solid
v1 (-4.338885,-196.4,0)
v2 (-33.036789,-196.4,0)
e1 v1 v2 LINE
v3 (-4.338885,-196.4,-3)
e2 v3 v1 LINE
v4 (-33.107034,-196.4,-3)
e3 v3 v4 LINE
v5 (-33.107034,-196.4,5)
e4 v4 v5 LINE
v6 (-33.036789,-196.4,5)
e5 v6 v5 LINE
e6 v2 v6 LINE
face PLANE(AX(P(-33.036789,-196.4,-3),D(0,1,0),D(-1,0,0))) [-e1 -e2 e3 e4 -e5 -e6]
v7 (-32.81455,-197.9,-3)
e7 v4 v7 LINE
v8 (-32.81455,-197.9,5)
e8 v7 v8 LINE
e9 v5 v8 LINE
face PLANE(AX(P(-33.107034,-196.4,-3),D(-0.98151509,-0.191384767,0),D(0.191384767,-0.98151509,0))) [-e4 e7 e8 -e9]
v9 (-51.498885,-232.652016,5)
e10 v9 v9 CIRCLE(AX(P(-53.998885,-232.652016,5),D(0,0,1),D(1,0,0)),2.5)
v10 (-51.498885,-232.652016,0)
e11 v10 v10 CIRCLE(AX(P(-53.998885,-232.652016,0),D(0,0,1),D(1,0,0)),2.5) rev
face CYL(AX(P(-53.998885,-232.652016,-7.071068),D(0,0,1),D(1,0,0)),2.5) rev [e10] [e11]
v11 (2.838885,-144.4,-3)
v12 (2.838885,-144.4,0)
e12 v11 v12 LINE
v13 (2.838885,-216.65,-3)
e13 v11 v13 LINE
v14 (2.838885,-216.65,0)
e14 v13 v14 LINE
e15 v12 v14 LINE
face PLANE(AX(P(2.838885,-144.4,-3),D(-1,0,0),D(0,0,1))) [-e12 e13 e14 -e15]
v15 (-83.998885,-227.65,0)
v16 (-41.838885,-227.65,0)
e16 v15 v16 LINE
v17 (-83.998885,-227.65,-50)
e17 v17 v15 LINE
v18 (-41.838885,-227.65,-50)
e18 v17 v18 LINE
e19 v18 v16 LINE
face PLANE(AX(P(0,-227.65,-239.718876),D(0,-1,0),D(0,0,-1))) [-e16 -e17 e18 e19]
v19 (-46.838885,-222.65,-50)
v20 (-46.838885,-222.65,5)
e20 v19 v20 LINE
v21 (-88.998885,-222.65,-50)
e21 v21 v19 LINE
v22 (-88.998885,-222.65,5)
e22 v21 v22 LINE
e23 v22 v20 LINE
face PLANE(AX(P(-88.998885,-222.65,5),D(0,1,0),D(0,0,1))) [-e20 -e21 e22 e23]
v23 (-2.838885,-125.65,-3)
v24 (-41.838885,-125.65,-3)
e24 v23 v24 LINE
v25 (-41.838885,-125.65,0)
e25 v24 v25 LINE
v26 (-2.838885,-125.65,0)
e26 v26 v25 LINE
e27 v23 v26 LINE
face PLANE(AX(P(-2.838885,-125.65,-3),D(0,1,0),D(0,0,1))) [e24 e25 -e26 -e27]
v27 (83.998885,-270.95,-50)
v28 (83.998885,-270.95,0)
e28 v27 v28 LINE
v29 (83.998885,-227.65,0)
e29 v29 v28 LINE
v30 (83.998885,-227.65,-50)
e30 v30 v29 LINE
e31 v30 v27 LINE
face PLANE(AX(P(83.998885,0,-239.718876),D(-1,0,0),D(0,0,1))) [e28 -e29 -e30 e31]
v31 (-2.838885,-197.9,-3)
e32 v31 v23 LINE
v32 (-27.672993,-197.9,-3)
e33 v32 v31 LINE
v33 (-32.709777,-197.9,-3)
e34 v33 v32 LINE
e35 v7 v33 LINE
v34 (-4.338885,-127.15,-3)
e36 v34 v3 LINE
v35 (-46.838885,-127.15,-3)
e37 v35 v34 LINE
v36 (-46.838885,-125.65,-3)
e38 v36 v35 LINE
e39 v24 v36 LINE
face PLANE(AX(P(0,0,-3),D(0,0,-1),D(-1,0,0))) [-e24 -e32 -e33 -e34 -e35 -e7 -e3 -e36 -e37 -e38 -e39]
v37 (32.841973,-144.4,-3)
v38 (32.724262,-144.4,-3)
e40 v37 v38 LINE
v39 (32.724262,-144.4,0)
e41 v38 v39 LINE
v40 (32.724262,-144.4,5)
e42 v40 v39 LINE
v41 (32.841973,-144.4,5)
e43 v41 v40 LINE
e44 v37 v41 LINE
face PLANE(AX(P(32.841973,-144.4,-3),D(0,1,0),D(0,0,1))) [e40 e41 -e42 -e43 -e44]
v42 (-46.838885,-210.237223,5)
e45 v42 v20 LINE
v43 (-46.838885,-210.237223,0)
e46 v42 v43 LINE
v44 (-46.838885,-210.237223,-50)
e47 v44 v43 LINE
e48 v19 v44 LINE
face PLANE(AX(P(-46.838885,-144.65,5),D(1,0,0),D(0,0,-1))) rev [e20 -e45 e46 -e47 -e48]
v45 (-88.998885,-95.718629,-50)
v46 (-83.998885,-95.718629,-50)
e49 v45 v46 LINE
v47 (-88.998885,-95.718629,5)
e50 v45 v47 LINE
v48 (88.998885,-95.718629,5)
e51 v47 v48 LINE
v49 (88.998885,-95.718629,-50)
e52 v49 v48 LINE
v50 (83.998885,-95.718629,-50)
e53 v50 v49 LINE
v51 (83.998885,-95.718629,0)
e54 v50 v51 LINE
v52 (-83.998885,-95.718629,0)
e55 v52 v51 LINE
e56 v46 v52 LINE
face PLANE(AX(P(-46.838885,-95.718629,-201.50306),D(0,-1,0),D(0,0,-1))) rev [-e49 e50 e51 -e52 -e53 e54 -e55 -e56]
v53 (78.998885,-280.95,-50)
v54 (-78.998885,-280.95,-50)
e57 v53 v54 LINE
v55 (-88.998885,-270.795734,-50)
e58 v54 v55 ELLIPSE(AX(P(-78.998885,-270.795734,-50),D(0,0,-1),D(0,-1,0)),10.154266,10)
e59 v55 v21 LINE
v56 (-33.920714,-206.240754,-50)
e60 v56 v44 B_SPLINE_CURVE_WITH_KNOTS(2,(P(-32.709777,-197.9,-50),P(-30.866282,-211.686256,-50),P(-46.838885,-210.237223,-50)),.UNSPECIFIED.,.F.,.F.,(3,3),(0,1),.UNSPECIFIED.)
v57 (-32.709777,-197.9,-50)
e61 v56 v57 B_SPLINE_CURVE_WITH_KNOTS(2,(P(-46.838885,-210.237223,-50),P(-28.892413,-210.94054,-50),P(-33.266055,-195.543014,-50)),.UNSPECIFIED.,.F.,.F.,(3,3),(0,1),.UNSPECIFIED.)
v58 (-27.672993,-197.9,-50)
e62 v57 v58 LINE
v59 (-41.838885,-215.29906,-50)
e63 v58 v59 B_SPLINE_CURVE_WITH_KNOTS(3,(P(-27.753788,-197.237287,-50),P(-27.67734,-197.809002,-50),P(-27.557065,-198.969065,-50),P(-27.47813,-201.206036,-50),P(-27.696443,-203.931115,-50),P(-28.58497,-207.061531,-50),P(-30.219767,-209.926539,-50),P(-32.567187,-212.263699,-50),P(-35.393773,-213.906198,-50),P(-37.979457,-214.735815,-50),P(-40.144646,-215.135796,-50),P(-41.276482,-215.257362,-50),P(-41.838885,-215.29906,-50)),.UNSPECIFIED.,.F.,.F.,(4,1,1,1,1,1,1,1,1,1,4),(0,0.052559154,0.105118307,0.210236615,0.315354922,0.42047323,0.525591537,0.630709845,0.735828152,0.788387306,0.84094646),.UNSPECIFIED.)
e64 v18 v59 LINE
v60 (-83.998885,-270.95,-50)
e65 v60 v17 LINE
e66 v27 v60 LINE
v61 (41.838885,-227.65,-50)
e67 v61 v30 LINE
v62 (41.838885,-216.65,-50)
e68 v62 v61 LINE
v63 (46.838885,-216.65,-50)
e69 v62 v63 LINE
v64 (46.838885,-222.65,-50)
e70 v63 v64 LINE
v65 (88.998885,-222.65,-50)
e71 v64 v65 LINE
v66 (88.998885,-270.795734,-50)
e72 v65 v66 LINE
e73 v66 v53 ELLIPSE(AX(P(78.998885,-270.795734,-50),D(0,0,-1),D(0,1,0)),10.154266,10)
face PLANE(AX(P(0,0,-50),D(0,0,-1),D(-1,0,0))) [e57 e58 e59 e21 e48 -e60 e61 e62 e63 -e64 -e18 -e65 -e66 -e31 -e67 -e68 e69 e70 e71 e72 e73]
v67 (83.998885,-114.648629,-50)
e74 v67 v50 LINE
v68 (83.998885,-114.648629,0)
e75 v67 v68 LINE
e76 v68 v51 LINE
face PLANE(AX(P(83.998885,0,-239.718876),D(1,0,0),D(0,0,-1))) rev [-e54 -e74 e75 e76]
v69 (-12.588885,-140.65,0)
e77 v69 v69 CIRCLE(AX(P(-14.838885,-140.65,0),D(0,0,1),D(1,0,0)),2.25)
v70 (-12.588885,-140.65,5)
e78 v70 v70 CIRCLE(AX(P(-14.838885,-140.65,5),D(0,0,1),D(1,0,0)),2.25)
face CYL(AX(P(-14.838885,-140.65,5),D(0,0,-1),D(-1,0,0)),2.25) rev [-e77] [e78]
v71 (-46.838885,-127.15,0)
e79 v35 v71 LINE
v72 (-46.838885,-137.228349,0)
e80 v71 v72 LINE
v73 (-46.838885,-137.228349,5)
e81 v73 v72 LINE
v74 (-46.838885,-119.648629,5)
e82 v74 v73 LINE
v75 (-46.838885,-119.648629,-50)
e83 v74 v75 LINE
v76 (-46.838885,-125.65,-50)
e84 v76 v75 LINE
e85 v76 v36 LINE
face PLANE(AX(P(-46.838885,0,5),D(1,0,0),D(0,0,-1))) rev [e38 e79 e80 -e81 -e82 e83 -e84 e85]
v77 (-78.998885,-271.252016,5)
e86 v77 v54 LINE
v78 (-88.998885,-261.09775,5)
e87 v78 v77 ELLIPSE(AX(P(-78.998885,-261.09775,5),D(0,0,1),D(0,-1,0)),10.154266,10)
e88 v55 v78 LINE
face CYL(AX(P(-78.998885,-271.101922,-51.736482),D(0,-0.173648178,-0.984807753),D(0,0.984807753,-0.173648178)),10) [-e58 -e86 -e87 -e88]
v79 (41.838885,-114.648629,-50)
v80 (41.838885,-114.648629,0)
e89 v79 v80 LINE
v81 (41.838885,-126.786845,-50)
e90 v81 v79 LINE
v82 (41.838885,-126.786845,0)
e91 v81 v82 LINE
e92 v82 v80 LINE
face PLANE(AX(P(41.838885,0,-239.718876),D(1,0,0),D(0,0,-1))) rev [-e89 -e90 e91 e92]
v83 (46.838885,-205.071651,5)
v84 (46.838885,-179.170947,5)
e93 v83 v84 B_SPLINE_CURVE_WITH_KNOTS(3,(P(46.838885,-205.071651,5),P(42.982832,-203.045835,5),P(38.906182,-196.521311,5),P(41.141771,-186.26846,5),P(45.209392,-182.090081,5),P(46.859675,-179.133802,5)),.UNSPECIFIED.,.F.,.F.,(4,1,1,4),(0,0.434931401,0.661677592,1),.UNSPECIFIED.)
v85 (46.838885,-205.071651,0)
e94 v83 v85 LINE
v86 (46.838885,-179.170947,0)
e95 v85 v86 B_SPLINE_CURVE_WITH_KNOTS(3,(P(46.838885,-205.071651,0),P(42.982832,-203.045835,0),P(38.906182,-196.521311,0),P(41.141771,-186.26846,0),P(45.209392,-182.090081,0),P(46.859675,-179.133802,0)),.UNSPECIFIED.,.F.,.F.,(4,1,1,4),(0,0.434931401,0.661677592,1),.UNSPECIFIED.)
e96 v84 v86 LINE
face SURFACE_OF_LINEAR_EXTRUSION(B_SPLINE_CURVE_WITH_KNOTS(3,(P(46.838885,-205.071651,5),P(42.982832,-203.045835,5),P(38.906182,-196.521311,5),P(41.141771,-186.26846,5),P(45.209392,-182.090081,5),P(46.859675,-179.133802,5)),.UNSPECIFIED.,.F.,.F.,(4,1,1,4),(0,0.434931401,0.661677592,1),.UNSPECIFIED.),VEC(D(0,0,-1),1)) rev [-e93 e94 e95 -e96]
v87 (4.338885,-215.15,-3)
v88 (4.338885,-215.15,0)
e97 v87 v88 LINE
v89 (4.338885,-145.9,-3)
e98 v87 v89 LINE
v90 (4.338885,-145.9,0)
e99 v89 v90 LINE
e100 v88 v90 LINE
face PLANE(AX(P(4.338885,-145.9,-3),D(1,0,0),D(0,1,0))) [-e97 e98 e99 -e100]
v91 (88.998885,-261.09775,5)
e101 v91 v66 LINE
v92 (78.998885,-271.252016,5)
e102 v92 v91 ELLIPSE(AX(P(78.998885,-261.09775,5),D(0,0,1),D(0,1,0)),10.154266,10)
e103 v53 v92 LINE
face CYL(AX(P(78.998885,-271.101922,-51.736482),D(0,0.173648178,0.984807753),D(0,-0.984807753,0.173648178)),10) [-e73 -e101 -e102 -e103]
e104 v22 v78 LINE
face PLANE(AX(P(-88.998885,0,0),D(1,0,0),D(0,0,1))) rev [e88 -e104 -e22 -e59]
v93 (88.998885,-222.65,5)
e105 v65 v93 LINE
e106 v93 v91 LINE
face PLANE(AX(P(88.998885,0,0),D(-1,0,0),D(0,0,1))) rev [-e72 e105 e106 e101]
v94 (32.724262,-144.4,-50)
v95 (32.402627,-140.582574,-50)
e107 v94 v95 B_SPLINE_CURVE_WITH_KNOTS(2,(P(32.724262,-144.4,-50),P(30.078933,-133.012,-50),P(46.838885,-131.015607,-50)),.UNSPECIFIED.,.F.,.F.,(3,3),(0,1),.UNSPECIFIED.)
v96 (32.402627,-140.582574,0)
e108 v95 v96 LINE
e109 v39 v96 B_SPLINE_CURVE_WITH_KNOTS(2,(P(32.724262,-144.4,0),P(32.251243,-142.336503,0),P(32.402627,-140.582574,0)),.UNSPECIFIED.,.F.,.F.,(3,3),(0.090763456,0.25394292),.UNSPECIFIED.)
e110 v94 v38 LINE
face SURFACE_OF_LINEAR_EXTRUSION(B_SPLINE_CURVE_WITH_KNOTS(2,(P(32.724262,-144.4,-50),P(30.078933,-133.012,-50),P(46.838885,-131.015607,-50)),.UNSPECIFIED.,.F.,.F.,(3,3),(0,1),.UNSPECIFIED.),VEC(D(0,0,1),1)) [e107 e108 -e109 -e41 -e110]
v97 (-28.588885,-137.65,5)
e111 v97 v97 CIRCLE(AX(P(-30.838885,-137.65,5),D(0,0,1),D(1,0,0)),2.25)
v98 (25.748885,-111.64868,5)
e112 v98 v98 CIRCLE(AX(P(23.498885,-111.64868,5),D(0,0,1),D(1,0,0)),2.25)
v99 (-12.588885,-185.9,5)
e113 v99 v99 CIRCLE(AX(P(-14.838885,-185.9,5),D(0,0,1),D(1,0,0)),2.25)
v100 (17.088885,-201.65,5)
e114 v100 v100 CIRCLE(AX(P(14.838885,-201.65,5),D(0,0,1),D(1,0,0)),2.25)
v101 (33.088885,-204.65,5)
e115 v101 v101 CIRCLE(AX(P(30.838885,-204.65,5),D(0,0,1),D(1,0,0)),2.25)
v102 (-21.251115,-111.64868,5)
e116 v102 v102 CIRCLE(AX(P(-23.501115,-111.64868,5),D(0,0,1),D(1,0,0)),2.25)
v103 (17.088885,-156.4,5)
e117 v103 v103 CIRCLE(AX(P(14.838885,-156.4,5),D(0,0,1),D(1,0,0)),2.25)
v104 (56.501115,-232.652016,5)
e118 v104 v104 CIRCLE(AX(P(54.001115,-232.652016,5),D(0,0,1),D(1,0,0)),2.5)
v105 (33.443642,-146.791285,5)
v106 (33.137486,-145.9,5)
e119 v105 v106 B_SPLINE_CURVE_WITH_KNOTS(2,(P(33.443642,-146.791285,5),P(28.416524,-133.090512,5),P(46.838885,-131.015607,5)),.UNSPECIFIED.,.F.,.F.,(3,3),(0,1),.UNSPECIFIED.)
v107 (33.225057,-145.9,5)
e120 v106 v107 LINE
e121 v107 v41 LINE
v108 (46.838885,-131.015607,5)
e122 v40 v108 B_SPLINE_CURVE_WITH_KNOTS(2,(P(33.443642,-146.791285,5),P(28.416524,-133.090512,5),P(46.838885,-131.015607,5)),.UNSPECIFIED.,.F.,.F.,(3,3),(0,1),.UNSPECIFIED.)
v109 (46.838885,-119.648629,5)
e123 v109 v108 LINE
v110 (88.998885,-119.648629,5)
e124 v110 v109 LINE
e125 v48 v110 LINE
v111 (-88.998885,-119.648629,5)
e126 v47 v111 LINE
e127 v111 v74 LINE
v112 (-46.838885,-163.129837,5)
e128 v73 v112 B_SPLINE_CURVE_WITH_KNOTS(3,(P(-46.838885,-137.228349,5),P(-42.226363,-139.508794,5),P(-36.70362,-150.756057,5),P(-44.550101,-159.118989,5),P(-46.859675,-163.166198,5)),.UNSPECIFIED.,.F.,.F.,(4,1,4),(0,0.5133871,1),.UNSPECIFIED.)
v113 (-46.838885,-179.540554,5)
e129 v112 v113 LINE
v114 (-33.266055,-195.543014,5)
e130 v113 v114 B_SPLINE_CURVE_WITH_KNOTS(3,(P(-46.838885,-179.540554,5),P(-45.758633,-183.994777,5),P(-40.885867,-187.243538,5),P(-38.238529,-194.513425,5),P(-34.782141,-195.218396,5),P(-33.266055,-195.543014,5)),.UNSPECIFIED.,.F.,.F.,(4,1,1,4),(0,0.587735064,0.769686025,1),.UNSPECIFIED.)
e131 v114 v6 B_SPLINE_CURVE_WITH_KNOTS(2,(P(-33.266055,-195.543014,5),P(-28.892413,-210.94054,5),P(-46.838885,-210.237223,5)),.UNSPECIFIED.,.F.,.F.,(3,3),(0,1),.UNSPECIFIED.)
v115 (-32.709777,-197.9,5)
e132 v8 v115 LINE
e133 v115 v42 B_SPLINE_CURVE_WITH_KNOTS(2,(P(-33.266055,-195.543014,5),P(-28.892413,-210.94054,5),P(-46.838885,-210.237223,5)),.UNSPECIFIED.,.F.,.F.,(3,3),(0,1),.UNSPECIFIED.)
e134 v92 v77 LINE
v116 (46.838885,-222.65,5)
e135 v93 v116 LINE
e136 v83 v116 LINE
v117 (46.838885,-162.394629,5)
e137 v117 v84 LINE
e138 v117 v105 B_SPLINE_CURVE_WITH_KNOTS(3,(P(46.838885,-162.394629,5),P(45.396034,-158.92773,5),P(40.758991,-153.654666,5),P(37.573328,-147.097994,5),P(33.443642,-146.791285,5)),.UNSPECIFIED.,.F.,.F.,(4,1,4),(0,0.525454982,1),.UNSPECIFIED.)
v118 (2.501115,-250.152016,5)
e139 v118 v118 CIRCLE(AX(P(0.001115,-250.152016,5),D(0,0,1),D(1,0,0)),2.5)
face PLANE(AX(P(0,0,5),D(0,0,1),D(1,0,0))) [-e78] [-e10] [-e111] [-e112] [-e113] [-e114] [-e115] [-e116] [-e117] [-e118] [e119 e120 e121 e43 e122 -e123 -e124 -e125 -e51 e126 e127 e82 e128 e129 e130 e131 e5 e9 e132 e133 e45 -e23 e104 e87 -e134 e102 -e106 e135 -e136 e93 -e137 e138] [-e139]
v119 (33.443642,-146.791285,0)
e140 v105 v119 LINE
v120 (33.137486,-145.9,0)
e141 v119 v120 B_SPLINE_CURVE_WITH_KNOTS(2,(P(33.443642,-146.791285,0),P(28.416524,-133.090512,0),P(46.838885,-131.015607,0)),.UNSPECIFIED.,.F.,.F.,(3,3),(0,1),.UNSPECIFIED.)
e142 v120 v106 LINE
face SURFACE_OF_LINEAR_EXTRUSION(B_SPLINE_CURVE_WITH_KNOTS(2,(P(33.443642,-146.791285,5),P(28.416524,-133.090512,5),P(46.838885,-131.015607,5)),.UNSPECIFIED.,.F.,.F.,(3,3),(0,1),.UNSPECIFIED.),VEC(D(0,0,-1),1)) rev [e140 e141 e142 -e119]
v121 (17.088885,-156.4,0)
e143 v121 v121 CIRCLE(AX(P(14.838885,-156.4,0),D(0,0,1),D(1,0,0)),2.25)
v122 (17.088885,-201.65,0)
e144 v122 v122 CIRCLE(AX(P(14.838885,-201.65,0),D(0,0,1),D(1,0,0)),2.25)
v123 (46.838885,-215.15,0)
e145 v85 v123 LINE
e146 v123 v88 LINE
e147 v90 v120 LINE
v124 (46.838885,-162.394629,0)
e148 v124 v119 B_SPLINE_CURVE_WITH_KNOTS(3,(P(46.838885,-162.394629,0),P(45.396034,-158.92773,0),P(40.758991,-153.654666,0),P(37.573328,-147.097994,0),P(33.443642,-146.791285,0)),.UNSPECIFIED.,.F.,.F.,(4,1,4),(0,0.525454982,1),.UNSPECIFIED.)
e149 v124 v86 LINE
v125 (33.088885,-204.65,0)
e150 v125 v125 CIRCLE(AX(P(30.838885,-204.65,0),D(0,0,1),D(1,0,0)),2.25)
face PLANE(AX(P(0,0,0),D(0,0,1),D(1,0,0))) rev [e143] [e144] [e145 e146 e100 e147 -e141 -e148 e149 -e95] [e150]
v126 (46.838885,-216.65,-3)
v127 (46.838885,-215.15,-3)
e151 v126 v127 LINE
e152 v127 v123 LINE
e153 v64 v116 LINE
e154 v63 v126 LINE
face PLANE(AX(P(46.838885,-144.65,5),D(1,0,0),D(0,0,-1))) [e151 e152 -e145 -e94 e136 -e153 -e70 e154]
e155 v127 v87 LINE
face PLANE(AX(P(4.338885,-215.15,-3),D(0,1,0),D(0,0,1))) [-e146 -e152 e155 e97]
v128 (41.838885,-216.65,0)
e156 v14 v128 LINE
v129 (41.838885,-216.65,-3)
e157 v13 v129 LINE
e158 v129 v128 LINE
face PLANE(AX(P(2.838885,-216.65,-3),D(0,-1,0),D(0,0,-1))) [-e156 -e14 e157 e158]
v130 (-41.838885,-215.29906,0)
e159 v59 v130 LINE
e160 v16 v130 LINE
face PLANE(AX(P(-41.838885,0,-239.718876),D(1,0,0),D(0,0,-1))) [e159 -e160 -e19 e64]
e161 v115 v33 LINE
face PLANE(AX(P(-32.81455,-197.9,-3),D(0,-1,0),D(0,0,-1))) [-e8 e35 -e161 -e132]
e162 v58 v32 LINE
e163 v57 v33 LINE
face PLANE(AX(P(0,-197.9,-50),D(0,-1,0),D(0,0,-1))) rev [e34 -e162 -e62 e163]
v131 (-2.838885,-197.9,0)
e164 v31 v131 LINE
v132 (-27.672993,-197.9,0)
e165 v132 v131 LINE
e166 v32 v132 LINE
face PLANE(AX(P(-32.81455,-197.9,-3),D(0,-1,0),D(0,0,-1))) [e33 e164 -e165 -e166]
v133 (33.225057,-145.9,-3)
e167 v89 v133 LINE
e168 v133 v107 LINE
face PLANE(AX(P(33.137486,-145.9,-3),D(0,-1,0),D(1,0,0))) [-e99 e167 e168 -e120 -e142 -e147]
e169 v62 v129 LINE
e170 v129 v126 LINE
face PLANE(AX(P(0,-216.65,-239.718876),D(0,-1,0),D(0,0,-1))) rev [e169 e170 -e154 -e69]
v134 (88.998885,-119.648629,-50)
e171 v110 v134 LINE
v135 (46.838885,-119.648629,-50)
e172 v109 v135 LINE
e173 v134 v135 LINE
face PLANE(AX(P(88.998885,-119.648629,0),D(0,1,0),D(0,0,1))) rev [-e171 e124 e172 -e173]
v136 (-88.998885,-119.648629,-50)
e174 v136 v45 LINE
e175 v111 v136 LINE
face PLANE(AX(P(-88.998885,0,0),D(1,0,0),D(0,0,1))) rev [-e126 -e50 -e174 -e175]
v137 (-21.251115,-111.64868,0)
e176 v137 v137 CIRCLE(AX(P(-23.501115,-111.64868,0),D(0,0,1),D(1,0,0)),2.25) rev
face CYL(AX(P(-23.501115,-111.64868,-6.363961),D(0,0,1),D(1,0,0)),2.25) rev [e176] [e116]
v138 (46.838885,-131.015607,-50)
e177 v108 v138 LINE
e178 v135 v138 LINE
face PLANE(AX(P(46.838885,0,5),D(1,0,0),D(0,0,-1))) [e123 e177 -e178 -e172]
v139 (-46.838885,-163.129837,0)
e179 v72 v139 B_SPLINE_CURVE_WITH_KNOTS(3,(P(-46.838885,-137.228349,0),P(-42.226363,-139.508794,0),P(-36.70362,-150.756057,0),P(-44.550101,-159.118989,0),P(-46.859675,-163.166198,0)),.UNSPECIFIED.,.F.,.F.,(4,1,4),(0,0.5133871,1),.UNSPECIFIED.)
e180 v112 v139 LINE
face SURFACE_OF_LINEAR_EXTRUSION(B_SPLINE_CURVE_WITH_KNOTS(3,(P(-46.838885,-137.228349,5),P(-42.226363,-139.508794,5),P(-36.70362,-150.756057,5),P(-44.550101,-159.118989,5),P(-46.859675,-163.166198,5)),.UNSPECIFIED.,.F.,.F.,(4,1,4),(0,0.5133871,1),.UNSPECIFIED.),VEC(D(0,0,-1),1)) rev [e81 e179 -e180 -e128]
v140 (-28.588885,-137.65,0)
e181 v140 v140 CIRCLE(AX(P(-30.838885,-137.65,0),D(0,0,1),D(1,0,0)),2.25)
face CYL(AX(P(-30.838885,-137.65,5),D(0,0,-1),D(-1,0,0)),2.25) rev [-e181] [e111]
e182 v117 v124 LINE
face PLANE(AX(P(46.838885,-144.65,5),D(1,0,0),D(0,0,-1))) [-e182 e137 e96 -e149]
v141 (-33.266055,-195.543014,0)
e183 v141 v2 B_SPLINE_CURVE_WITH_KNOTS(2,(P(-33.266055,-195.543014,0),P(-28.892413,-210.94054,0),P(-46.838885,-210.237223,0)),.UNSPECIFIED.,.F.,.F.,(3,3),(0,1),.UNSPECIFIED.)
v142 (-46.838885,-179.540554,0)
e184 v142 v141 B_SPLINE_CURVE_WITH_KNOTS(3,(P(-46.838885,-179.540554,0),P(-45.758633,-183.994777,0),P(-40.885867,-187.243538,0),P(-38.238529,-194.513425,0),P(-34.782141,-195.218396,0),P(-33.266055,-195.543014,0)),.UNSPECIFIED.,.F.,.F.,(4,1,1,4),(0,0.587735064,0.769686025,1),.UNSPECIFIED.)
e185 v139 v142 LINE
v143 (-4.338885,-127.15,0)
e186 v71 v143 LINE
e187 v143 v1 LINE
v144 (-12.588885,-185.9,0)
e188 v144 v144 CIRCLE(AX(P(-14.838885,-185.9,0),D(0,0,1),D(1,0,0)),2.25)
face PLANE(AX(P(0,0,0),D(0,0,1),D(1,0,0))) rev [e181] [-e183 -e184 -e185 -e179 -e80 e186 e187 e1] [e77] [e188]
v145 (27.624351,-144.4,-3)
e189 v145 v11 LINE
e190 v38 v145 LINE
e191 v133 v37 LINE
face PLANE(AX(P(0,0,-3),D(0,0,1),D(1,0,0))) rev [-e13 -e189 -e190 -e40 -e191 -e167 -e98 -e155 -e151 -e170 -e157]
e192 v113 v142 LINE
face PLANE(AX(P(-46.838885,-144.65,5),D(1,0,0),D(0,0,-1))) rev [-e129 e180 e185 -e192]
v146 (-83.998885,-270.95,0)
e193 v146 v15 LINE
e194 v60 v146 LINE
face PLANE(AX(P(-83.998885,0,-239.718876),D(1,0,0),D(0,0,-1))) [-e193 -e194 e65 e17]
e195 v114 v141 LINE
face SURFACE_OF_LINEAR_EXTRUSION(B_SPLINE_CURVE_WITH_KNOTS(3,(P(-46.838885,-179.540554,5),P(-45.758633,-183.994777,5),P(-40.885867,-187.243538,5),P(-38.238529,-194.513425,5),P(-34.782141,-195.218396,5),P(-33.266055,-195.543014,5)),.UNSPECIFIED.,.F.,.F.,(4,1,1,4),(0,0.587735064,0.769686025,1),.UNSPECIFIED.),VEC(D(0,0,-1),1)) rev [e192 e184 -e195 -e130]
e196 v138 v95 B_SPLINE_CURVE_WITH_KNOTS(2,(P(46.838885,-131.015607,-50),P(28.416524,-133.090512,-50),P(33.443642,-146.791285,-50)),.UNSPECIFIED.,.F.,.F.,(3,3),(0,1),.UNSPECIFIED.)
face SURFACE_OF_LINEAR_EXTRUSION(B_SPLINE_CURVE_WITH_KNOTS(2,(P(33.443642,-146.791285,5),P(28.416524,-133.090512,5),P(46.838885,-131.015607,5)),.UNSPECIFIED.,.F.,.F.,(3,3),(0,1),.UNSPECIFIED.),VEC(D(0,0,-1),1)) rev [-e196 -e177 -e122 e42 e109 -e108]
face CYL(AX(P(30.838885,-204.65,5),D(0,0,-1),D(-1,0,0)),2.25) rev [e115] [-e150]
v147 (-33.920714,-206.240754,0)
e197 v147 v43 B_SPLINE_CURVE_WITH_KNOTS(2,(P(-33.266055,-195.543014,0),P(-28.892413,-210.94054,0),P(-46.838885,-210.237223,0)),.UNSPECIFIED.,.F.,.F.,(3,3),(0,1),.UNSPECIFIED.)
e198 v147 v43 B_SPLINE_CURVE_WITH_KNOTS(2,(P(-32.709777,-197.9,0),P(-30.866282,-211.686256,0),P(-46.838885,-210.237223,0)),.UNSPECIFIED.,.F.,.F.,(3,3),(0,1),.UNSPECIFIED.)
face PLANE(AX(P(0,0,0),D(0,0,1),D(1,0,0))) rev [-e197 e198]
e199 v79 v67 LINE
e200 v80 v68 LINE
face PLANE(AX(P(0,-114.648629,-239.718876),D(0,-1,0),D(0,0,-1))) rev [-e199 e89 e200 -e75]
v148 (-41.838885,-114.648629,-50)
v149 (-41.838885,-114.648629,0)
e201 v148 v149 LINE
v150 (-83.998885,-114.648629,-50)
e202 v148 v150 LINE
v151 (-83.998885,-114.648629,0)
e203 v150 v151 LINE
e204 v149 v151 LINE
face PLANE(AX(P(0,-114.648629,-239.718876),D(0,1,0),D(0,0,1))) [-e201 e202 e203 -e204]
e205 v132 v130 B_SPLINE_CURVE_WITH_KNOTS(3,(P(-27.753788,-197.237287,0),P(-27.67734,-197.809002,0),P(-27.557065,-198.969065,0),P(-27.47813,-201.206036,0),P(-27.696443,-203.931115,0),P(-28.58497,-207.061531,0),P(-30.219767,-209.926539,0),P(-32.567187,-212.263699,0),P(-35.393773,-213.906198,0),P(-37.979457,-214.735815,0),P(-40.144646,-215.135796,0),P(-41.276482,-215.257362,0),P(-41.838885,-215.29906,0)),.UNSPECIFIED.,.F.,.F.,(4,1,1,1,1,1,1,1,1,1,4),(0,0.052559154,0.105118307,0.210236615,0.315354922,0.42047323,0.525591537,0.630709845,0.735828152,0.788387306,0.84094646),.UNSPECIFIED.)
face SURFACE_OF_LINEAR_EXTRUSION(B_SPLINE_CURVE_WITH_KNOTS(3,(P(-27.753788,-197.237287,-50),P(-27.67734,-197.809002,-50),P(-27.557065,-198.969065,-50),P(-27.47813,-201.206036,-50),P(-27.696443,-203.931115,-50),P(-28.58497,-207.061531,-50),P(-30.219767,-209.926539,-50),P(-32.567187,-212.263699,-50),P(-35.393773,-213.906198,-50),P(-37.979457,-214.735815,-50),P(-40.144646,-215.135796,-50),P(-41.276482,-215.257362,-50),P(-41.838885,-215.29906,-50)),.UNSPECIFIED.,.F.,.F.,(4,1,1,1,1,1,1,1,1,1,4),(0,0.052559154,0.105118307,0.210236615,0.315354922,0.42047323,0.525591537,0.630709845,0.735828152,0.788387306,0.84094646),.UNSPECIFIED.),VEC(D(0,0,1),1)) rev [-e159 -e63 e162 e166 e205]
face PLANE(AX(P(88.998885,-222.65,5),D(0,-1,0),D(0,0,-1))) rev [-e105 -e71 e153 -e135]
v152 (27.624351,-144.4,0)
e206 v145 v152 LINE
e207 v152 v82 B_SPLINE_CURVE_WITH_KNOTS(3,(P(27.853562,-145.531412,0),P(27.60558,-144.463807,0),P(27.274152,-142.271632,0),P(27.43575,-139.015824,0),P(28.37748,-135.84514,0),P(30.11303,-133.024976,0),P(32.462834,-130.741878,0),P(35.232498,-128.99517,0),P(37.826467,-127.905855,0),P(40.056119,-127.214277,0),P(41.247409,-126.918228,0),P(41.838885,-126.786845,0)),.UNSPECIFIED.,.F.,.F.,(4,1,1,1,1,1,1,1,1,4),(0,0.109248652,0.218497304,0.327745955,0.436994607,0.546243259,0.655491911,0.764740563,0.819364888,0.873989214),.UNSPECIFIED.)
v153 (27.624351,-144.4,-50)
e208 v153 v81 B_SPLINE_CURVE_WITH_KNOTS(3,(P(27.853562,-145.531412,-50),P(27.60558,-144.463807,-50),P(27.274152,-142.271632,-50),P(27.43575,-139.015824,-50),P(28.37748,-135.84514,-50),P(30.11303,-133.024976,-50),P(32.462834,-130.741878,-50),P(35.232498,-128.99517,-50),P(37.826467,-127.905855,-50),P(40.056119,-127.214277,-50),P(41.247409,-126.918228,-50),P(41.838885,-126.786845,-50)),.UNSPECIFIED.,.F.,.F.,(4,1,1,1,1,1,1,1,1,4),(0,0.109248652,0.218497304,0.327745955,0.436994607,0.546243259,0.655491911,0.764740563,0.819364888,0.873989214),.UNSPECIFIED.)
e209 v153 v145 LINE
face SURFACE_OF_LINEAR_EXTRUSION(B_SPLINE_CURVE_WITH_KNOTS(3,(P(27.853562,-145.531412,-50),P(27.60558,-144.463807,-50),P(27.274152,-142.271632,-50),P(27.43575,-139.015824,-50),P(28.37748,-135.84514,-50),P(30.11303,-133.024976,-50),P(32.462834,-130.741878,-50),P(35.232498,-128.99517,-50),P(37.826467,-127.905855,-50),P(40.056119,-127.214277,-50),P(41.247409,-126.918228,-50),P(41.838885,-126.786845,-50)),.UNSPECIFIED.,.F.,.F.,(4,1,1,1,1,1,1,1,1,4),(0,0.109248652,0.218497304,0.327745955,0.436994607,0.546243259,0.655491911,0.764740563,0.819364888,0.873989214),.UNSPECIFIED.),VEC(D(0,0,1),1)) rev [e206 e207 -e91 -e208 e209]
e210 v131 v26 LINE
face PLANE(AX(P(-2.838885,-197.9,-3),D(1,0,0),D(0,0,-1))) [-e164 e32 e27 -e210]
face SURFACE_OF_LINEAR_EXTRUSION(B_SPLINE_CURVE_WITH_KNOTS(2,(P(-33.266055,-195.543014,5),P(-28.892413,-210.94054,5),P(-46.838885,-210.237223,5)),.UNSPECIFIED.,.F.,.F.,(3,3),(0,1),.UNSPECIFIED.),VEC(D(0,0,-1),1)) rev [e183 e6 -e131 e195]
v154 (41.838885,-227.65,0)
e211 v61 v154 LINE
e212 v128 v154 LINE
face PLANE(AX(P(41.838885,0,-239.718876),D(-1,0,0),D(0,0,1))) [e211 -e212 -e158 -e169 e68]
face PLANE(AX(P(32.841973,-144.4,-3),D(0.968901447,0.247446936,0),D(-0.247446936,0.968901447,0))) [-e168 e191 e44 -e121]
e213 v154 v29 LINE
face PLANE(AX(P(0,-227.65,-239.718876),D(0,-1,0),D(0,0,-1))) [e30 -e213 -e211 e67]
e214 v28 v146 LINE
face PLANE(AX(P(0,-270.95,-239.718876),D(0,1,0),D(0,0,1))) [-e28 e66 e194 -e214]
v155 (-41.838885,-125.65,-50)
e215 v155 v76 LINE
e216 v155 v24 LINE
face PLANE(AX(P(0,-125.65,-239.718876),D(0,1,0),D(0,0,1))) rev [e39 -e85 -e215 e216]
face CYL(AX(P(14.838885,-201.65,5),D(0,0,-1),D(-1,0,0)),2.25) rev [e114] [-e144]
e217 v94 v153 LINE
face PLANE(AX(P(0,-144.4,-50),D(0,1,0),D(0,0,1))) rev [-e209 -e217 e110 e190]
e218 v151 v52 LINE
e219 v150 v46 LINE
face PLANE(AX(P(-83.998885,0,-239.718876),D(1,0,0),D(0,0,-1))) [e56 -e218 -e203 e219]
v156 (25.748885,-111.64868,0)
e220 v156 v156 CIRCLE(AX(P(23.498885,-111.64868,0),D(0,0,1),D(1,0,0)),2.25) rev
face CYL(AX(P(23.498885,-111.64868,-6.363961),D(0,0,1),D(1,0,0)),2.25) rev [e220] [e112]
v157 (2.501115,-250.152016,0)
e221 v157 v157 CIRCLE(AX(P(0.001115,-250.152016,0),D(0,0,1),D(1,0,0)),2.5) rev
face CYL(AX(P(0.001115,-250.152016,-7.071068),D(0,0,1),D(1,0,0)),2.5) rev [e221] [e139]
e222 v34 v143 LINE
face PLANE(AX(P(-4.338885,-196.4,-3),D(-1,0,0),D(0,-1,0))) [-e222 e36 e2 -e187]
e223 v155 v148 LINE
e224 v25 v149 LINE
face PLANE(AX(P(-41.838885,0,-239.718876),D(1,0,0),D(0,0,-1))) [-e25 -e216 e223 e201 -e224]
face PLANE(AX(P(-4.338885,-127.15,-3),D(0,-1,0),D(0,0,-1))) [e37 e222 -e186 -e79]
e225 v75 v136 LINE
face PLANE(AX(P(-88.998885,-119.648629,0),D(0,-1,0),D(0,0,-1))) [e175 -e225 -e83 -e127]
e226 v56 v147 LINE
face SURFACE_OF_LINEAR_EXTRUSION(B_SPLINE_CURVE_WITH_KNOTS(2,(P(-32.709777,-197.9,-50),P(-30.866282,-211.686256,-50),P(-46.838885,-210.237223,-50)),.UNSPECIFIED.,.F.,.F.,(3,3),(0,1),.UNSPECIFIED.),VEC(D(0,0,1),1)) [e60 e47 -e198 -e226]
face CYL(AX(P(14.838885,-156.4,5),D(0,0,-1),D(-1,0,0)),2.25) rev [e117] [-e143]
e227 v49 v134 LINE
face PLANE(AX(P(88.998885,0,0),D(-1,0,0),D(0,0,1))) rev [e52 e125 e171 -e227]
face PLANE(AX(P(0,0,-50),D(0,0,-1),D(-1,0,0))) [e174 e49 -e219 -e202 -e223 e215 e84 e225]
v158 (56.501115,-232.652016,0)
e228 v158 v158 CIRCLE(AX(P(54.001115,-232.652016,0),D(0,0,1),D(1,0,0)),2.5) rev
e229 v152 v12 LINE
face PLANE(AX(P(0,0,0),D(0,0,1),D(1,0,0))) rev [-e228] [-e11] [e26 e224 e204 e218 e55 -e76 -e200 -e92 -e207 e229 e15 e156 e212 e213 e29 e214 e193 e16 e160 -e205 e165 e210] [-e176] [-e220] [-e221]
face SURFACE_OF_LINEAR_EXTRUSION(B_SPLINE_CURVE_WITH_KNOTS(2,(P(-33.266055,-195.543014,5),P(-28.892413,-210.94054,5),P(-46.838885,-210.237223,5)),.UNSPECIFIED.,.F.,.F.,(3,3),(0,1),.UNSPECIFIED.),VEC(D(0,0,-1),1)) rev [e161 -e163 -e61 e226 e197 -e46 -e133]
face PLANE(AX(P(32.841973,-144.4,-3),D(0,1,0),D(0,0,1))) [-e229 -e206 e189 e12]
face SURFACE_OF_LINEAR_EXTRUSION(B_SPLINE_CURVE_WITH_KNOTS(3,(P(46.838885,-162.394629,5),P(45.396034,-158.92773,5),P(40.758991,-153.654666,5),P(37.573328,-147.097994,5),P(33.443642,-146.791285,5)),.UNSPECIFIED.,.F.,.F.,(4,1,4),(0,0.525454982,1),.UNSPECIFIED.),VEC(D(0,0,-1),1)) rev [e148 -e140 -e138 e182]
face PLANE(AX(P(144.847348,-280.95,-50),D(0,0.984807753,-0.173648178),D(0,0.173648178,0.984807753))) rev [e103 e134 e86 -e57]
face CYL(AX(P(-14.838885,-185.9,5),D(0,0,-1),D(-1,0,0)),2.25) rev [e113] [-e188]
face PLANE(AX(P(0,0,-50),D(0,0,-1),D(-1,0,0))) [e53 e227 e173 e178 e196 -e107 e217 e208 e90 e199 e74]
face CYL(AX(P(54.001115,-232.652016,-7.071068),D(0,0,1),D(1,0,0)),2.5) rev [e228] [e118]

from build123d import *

# Parameters (mm, degrees)
SKETCH1_R            = 2.25
BOSS_EXTRUDE1_DEPTH  = 5
SKETCH7_R            = 2
CUT_EXTRUDE1_DEPTH   = 10
SKETCH10_W           = 93.677769422
SKETCH10_H           = 89.648680449
CUT_EXTRUDE4_DEPTH   = 10
LPATTERN1_COUNT      = 2
LPATTERN1_PITCH      = 144.65
SKETCH13_W           = 93.677769422
SKETCH13_H           = 54.298680449
BOSS_EXTRUDE2_DEPTH  = 5
SKETCH18_W           = 93.677769422
SKETCH18_H           = 5
BOSS_EXTRUDE5_DEPTH  = 5
BOSS_EXTRUDE7_DEPTH  = 8
SKETCH19_W           = 93.677769422
SKETCH19_H           = 5
BOSS_EXTRUDE8_DEPTH  = 61.3
SKETCH21_W           = 93.677769422
SKETCH21_H           = 5
BOSS_EXTRUDE9_DEPTH  = 3
BOSS_EXTRUDE10_DEPTH = 50
SKETCH25_W           = 93.677769422
SKETCH25_H           = 119.069948178
CUT_EXTRUDE6_DEPTH   = 55
SKETCH29_W           = 5
SKETCH29_H           = 58.3
SKETCH29_H_2         = 23.93
BOSS_EXTRUDE12_DEPTH = 42.16
SKETCH34_R           = 2.25
CUT_EXTRUDE10_DEPTH  = 5
BOSS_EXTRUDE13_DEPTH = 50
CUT_EXTRUDE11_DEPTH  = 177.997769422
FILLET1_R            = 10
SKETCH38_R           = 2.5
CUT_EXTRUDE12_DEPTH  = 5


# Read off the part's stored shape, not the designer's step: Boss-Extrude10
with BuildPart() as part:
    # Sketch1 → Boss-Extrude1 (new body)
    with BuildSketch(Plane.XY):
        with BuildLine():
            Line((0, 110), (-46.838884711, 110))
            Line((-46.838884711, 110), (-46.838884711, 100.421650596))
            add(Edge.make_bspline(
                [(-46.838884711, 100.421650596), (-42.226362844, 98.141206473), (-36.711667831, 86.910333368), (-44.527260711, 78.55539065), (-46.838884711, 74.520163403)],
                knots=[0, 0, 0, 0, 0.5133871, 0.998542736, 0.998542736, 0.998542736, 0.998542736], degree=3))
            Line((-46.838884711, 74.520163403), (-46.838884711, 58.109446399))
            add(Edge.make_bspline(
                [(-46.838884711, 58.109446399), (-45.758632516, 53.655222634), (-40.885867203, 50.40646242), (-38.238529072, 43.136574556), (-34.782140744, 42.431604419), (-33.266055192, 42.106985538)],
                knots=[0, 0, 0, 0, 0.587735064, 0.769686025, 1, 1, 1, 1], degree=3))
            add(Edge.make_bspline(
                [(-33.266055192, 42.106985538), (-28.892413212, 26.709459558), (-46.838884711, 27.412777151)],
                knots=[0, 0, 0, 1, 1, 1], degree=2))
            Line((-46.838884711, 27.412777151), (-46.838884711, 7.421650596))
            add(Edge.make_bspline(
                [(-46.838884711, 7.421650596), (-42.226362844, 5.141206473), (-36.711667831, -6.089666632), (-44.527260711, -14.44460935), (-46.838884711, -18.479836597)],
                knots=[0, 0, 0, 0, 0.5133871, 0.998542736, 0.998542736, 0.998542736, 0.998542736], degree=3))
            Line((-46.838884711, -18.479836597), (-46.838884711, -34.890553601))
            add(Edge.make_bspline(
                [(-46.838884711, -34.890553601), (-45.758632516, -39.344777366), (-40.885867203, -42.59353758), (-38.238529072, -49.863425444), (-34.782140744, -50.568395581), (-33.266055192, -50.893014462)],
                knots=[0, 0, 0, 0, 0.587735064, 0.769686025, 1, 1, 1, 1], degree=3))
            add(Edge.make_bspline(
                [(-33.266055192, -50.893014462), (-28.892413212, -66.290540442), (-46.838884711, -65.587222849)],
                knots=[0, 0, 0, 1, 1, 1], degree=2))
            Line((-46.838884711, -65.587222849), (-46.838884711, -70))
            Line((-46.838884711, -70), (0, -70))
            Line((0, -70), (46.838884711, -70))
            Line((46.838884711, -70), (46.838884711, -60.421650596))
            add(Edge.make_bspline(
                [(46.838884711, -60.421650596), (42.982832164, -58.395834606), (38.906182163, -51.871311027), (41.138601483, -41.632996987), (45.188996373, -37.461060264), (46.838884711, -34.520947075)],
                knots=[0, 0, 0, 0, 0.434931401, 0.661677592, 0.998582109, 0.998582109, 0.998582109, 0.998582109], degree=3))
            Line((46.838884711, -34.520947075), (46.838884711, -17.744628899))
            add(Edge.make_bspline(
                [(46.838884711, -17.744628899), (45.396033977, -14.277729688), (40.758990778, -9.004665614), (37.573327769, -2.447994476), (33.443642317, -2.141285146)],
                knots=[0, 0, 0, 0, 0.525454982, 1, 1, 1, 1], degree=3))
            add(Edge.make_bspline(
                [(33.443642317, -2.141285146), (28.416523532, 11.559488336), (46.838884711, 13.634393344)],
                knots=[0, 0, 0, 1, 1, 1], degree=2))
            Line((46.838884711, 13.634393344), (46.838884711, 32.578349404))
            add(Edge.make_bspline(
                [(46.838884711, 32.578349404), (42.982832164, 34.604165394), (38.906182163, 41.128688973), (41.138601483, 51.367003013), (45.188996373, 55.538939736), (46.838884711, 58.479052925)],
                knots=[0, 0, 0, 0, 0.434931401, 0.661677592, 0.998582109, 0.998582109, 0.998582109, 0.998582109], degree=3))
            Line((46.838884711, 58.479052925), (46.838884711, 75.255371101))
            add(Edge.make_bspline(
                [(46.838884711, 75.255371101), (45.396033977, 78.722270312), (40.758990778, 83.995334386), (37.573327769, 90.552005524), (33.443642317, 90.858714854)],
                knots=[0, 0, 0, 0, 0.525454982, 1, 1, 1, 1], degree=3))
            Line((33.443642317, 90.858714854), (0, 110))
        make_face()
        with Locations((-14.838884711, -41.25)):
            Circle(SKETCH1_R, mode=Mode.SUBTRACT)
        with Locations((-30.838884711, 7)):
            Circle(SKETCH1_R, mode=Mode.SUBTRACT)
        with Locations((-14.838884711, 4)):
            Circle(SKETCH1_R, mode=Mode.SUBTRACT)
        with Locations((14.838884711, -57)):
            Circle(SKETCH1_R, mode=Mode.SUBTRACT)
        with Locations((30.838884711, -60)):
            Circle(SKETCH1_R, mode=Mode.SUBTRACT)
        with Locations((14.838884711, -11.75)):
            Circle(SKETCH1_R, mode=Mode.SUBTRACT)
        with Locations((-14.838884711, 51.75)):
            Circle(SKETCH1_R, mode=Mode.SUBTRACT)
        with Locations((-30.838884711, 100)):
            Circle(SKETCH1_R, mode=Mode.SUBTRACT)
        with Locations((-14.838884711, 97)):
            Circle(SKETCH1_R, mode=Mode.SUBTRACT)
        with Locations((14.838884711, 36)):
            Circle(SKETCH1_R, mode=Mode.SUBTRACT)
        with Locations((30.838884711, 33)):
            Circle(SKETCH1_R, mode=Mode.SUBTRACT)
        with Locations((14.838884711, 81.25)):
            Circle(SKETCH1_R, mode=Mode.SUBTRACT)
    extrude(amount=BOSS_EXTRUDE1_DEPTH)

    # Sketch7 → Cut-Extrude1 (cut)
    with BuildSketch(Plane.XY.offset(5)):
        with Locations((-41.838884711, 23.5)):
            Circle(SKETCH7_R)
        with Locations((-41.838884711, 67)):
            Circle(SKETCH7_R)
        with Locations((40.861115289, 67)):
            Circle(SKETCH7_R)
        with Locations((40.861115289, 23.5)):
            Circle(SKETCH7_R)
    extrude(amount=-CUT_EXTRUDE1_DEPTH, mode=Mode.SUBTRACT)

    # Sketch10 → Cut-Extrude4 (cut)
    with BuildSketch(Plane.XY.offset(5)):
        with Locations((0, 65.175659775)):
            Rectangle(SKETCH10_W, SKETCH10_H)
    extrude(amount=-CUT_EXTRUDE4_DEPTH, mode=Mode.SUBTRACT)


with BuildPart() as lpattern1_1:
    # LPattern1: pattern copy
    add(part.part.moved(Location(Vector(0, -1, 0) * (1 * LPATTERN1_PITCH))))


with BuildPart() as part_1:
    add(part.part)

    add(lpattern1_1.part)  # Boss-Extrude2 merges LPattern1_1
    # Sketch13 → Boss-Extrude2 (add)
    with BuildSketch(Plane.XY.offset(5)):
        with Locations((0, -97.149340225)):
            Rectangle(SKETCH13_W, SKETCH13_H)
    extrude(amount=-BOSS_EXTRUDE2_DEPTH)

    # Sketch18 → Boss-Extrude5 (add)
    with BuildSketch(Plane.XY.offset(5)):
        with Locations((0, -217.15)):
            Rectangle(SKETCH18_W, SKETCH18_H)
    extrude(amount=-BOSS_EXTRUDE5_DEPTH)

    # Sketch17 → Boss-Extrude7 (add)
    with BuildSketch(Plane.XY.offset(5)):
        Polygon((33.137486483, -1.25), (4.338884711, -1.25), (4.338884711, -70.5), (46.838884711, -70.5), (46.838884711, -72), (2.838884711, -72), (2.838884711, 0.25), (32.841973097, 0.25), (33.225056852, -1.25), align=None)
        Polygon((-33.036788629, -51.75), (-4.338884711, -51.75), (-4.338884711, 17.5), (-46.838884711, 17.5), (-46.838884711, 19), (-2.838884711, 19), (-2.838884711, -53.25), (-32.814550412, -53.25), (-33.107034097, -51.75), align=None)
        Polygon((-33.036788629, -196.4), (-4.338884711, -196.4), (-4.338884711, -127.15), (-46.838884711, -127.15), (-46.838884711, -125.65), (-2.838884711, -125.65), (-2.838884711, -197.9), (-32.814550412, -197.9), (-33.107034097, -196.4), align=None)
        Polygon((33.137486483, -145.9), (4.338884711, -145.9), (4.338884711, -215.15), (46.838884711, -215.15), (46.838884711, -216.65), (2.838884711, -216.65), (2.838884711, -144.4), (32.841973097, -144.4), (33.225056852, -145.9), align=None)
    extrude(amount=-BOSS_EXTRUDE7_DEPTH)

    # Sketch19 → Boss-Extrude8 (add)
    with BuildSketch(Plane.XZ.offset(219.65)):
        with Locations((0, 2.5)):
            Rectangle(SKETCH19_W, SKETCH19_H)
    extrude(amount=BOSS_EXTRUDE8_DEPTH)

    # Sketch21 → Boss-Extrude9 (add)
    with BuildSketch(Plane(origin=(0, 20.351319551, 0), x_dir=(1, 0, 0), z_dir=(0, 1, 0))):
        with Locations((0, -2.5)):
            Rectangle(SKETCH21_W, SKETCH21_H)
    extrude(amount=BOSS_EXTRUDE9_DEPTH)

    # Boss-Extrude10 outline → Boss-Extrude10 (add)
    with BuildSketch(Plane(origin=(0, 0, 0), x_dir=(-1, 0, 0), z_dir=(0, 0, -1))):
        with BuildLine():
            add(Edge.make_bspline(
                [(-32.724261898, 0.25), (-32.245095706, 2.312784936), (-32.402626668, 4.067426464)],
                knots=[0, 0, 0, 0.181136716, 0.181136716, 0.181136716], degree=2))
            Line((-32.724261898, 0.25), (-29.65751977, 0.25))
            add(Edge.make_bspline(
                [(-29.65751977, 0.25), (-29.601842647, 0.538366952), (-29.466363581, 1.344697446), (-29.301208708, 3.141766485), (-29.47061633, 5.619429231), (-30.412970229, 8.408598154), (-32.080129332, 10.83738709), (-34.332026266, 12.794823629), (-37.046086715, 14.308755459), (-39.670197714, 15.260630902), (-41.969837518, 15.859321379), (-43.221486034, 16.113254715), (-43.838884711, 16.22336356)],
                knots=[0.025422655, 0.025422655, 0.025422655, 0.025422655, 0.057672577, 0.115345154, 0.230690308, 0.346035462, 0.461380617, 0.576725771, 0.692070925, 0.807416079, 0.865088656, 0.922761233, 0.922761233, 0.922761233, 0.922761233], degree=3))
            Line((-43.838884711, 16.22336356), (-43.838884711, 20.351319551))
            Line((-43.838884711, 20.351319551), (43.838884711, 20.351319551))
            Line((43.838884711, 20.351319551), (43.838884711, 19))
            Line((43.838884711, 19), (46.838884711, 19))
            Line((46.838884711, 19), (46.838884711, 23.351319551))
            Line((46.838884711, 23.351319551), (-46.838884711, 23.351319551))
            Line((-46.838884711, 23.351319551), (-46.838884711, 13.634393344))
            add(Edge.make_bspline(
                [(-32.402626668, 4.067426464), (-33.094751911, 12.086395793), (-46.838884711, 13.634393344)],
                knots=[0.25394293, 0.25394293, 0.25394293, 1, 1, 1], degree=2))
        make_face()
        with BuildLine():
            add(Edge.make_bspline(
                [(32.709776931, -53.25), (31.734780647, -58.560461643), (33.920713563, -61.590754477)],
                knots=[0.079873384, 0.079873384, 0.079873384, 0.456195017, 0.456195017, 0.456195017], degree=2))
            Line((32.709776931, -53.25), (27.672993194, -53.25))
            add(Edge.make_bspline(
                [(27.672993194, -53.25), (27.634044039, -53.603919753), (27.549470722, -54.53429273), (27.478130031, -56.55603599), (27.696443256, -59.281114668), (28.584970164, -62.41153087), (30.219766888, -65.27653857), (32.567186832, -67.613698936), (35.393773129, -69.256198214), (37.979457465, -70.085815151), (40.144646291, -70.485795849), (41.276481585, -70.607362141), (41.838884711, -70.649060215)],
                knots=[0.020227728, 0.020227728, 0.020227728, 0.020227728, 0.052559154, 0.105118307, 0.210236615, 0.315354922, 0.42047323, 0.525591537, 0.630709845, 0.735828152, 0.788387306, 0.840946459, 0.840946459, 0.840946459, 0.840946459], degree=3))
            Line((41.838884711, -70.649060215), (46.838884711, -70.649060215))
            Line((46.838884711, -70.649060215), (46.838884711, -65.587222848))
            add(Edge.make_bspline(
                [(33.920713563, -61.590754477), (36.999202525, -66.479878046), (46.838884711, -65.587222848)],
                knots=[0.383965009, 0.383965009, 0.383965009, 1, 1, 1], degree=2))
        make_face()
        with BuildLine():
            add(Edge.make_bspline(
                [(-32.724261899, -144.4), (-32.245095735, -142.337215187), (-32.40262665, -140.582573745)],
                knots=[0, 0, 0, 0.181136705, 0.181136705, 0.181136705], degree=2))
            Line((-32.724261899, -144.4), (-27.624350546, -144.4))
            add(Edge.make_bspline(
                [(-27.624350546, -144.4), (-27.502918691, -143.696257513), (-27.293028635, -141.891316279), (-27.435749972, -139.015823852), (-28.37747966, -135.845139515), (-30.113029916, -133.024976386), (-32.462833621, -130.741878365), (-35.232498366, -128.995170141), (-37.82646734, -127.905854752), (-40.056119375, -127.214276507), (-41.247409264, -126.918228045), (-41.838884711, -126.786845404)],
                knots=[0.038284512, 0.038284512, 0.038284512, 0.038284512, 0.109248652, 0.218497304, 0.327745955, 0.436994607, 0.546243259, 0.655491911, 0.764740563, 0.819364888, 0.873989214, 0.873989214, 0.873989214, 0.873989214], degree=3))
            Line((-41.838884711, -126.786845404), (-46.838884711, -126.786845404))
            Line((-46.838884711, -126.786845404), (-46.838884711, -131.015606656))
            add(Edge.make_bspline(
                [(-32.40262665, -140.582573745), (-33.094751732, -132.563604227), (-46.838884711, -131.015606656)],
                knots=[0.25394292, 0.25394292, 0.25394292, 1, 1, 1], degree=2))
        make_face()
        with BuildLine():
            add(Edge.make_bspline(
                [(32.709776931, -197.9), (31.734780645, -203.210461655), (33.920713573, -206.240754491)],
                knots=[0.079873384, 0.079873384, 0.079873384, 0.456195018, 0.456195018, 0.456195018], degree=2))
            Line((32.709776931, -197.9), (27.672993196, -197.9))
            add(Edge.make_bspline(
                [(27.672993196, -197.9), (27.63404404, -198.253919753), (27.549470724, -199.184292729), (27.478130032, -201.206035989), (27.696443257, -203.931114667), (28.584970165, -207.061530869), (30.219766889, -209.926538569), (32.567186833, -212.263698935), (35.393773129, -213.906198214), (37.979457465, -214.73581515), (40.144646291, -215.135795849), (41.276481585, -215.25736214), (41.838884711, -215.299060215)],
                knots=[0.020227728, 0.020227728, 0.020227728, 0.020227728, 0.052559154, 0.105118307, 0.210236615, 0.315354922, 0.42047323, 0.525591537, 0.630709845, 0.735828152, 0.788387306, 0.84094646, 0.84094646, 0.84094646, 0.84094646], degree=3))
            Line((41.838884711, -215.299060215), (46.838884711, -215.299060215))
            Line((46.838884711, -215.299060215), (46.838884711, -210.237222849))
            add(Edge.make_bspline(
                [(33.920713573, -206.240754491), (36.999202539, -211.129878044), (46.838884711, -210.237222849)],
                knots=[0.38396501, 0.38396501, 0.38396501, 1, 1, 1], degree=2))
        make_face()
    extrude(amount=BOSS_EXTRUDE10_DEPTH)

    # Sketch25 → Cut-Extrude6 (cut)
    with BuildSketch(Plane.XY.offset(5)):
        with Locations((0, -36.183654538)):
            Rectangle(SKETCH25_W, SKETCH25_H)
    extrude(amount=-CUT_EXTRUDE6_DEPTH, mode=Mode.SUBTRACT)

    # Sketch29 → Boss-Extrude12 (add)
    with BuildSketch(Plane(origin=(46.838884711, 0, 0), x_dir=(0, 0, -1), z_dir=(1, 0, 0))):
        with Locations((-2.5, -251.8)):
            Rectangle(SKETCH29_W, SKETCH29_H)
        with Locations((-2.5, -107.683628627)):
            Rectangle(SKETCH29_W, SKETCH29_H_2)
    boss_extrude12 = extrude(amount=BOSS_EXTRUDE12_DEPTH)

    # Mirror1: Boss-Extrude12 across plane
    add(boss_extrude12.mirror(Plane(origin=(0, 0, 0), x_dir=(0, 0, 1), z_dir=(1, 0, 0))))

    # Sketch34 → Cut-Extrude10 (cut)
    with BuildSketch(Plane.XY.offset(5)):
        with Locations((-23.501115289, -111.648680449)):
            Circle(SKETCH34_R)
        with Locations((23.498884711, -111.648680449)):
            Circle(SKETCH34_R)
    extrude(amount=-CUT_EXTRUDE10_DEPTH, mode=Mode.SUBTRACT)

    # Sketch35 → Boss-Extrude13 (add)
    with BuildSketch(Plane(origin=(0, 0, 0), x_dir=(-1, 0, 0), z_dir=(0, 0, -1))):
        Polygon((-41.838884711, -216.65), (-46.838884711, -216.65), (-46.838884711, -222.65), (-88.998884711, -222.65), (-88.998884711, -280.95), (88.998884711, -280.95), (88.998884711, -222.65), (46.838884711, -222.65), (46.838884711, -215.299060215), (41.838884711, -215.299060215), (41.838884711, -227.65), (83.998884711, -227.65), (83.998884711, -270.95), (-83.998884711, -270.95), (-83.998884711, -227.65), (-41.838884711, -227.65), align=None)
        Polygon((-46.838884711, -119.648628627), (-46.838884711, -126.786845404), (-41.838884711, -126.786845404), (-41.838884711, -114.648628627), (-83.998884711, -114.648628627), (-83.998884711, -95.718628627), (-88.998884711, -95.718628627), (-88.998884711, -119.648628627), align=None)
        Polygon((88.998884711, -95.718628627), (83.998884711, -95.718628627), (83.998884711, -114.648628627), (41.838884711, -114.648628627), (41.838884711, -125.65), (46.838884711, -125.65), (46.838884711, -119.648628627), (88.998884711, -119.648628627), align=None)
    extrude(amount=BOSS_EXTRUDE13_DEPTH)

    # Sketch36 → Cut-Extrude11 (cut)
    with BuildSketch(Plane.ZY.offset(88.998884711)):
        Polygon((-50, -280.95), (5, -271.252016061), (5, -280.95), align=None)
    extrude(amount=-CUT_EXTRUDE11_DEPTH, mode=Mode.SUBTRACT)

    # Fillet1
    fillet1_edges = [part_1.edges().sort_by_distance(p)[0] for p in [
        (-88.998884711, -276.101008031, -22.5),
        (88.998884711, -276.101008031, -22.5),
    ]]
    fillet(fillet1_edges, radius=FILLET1_R)

    # Sketch38 → Cut-Extrude12 (cut)
    with BuildSketch(Plane.XY.offset(5)):
        with Locations((-53.998884711, -232.652016061)):
            Circle(SKETCH38_R)
        with Locations((0.001115289, -250.152016061)):
            Circle(SKETCH38_R)
        with Locations((54.001115289, -232.652016061)):
            Circle(SKETCH38_R)
    extrude(amount=-CUT_EXTRUDE12_DEPTH, mode=Mode.SUBTRACT)


solid = part_1.part
